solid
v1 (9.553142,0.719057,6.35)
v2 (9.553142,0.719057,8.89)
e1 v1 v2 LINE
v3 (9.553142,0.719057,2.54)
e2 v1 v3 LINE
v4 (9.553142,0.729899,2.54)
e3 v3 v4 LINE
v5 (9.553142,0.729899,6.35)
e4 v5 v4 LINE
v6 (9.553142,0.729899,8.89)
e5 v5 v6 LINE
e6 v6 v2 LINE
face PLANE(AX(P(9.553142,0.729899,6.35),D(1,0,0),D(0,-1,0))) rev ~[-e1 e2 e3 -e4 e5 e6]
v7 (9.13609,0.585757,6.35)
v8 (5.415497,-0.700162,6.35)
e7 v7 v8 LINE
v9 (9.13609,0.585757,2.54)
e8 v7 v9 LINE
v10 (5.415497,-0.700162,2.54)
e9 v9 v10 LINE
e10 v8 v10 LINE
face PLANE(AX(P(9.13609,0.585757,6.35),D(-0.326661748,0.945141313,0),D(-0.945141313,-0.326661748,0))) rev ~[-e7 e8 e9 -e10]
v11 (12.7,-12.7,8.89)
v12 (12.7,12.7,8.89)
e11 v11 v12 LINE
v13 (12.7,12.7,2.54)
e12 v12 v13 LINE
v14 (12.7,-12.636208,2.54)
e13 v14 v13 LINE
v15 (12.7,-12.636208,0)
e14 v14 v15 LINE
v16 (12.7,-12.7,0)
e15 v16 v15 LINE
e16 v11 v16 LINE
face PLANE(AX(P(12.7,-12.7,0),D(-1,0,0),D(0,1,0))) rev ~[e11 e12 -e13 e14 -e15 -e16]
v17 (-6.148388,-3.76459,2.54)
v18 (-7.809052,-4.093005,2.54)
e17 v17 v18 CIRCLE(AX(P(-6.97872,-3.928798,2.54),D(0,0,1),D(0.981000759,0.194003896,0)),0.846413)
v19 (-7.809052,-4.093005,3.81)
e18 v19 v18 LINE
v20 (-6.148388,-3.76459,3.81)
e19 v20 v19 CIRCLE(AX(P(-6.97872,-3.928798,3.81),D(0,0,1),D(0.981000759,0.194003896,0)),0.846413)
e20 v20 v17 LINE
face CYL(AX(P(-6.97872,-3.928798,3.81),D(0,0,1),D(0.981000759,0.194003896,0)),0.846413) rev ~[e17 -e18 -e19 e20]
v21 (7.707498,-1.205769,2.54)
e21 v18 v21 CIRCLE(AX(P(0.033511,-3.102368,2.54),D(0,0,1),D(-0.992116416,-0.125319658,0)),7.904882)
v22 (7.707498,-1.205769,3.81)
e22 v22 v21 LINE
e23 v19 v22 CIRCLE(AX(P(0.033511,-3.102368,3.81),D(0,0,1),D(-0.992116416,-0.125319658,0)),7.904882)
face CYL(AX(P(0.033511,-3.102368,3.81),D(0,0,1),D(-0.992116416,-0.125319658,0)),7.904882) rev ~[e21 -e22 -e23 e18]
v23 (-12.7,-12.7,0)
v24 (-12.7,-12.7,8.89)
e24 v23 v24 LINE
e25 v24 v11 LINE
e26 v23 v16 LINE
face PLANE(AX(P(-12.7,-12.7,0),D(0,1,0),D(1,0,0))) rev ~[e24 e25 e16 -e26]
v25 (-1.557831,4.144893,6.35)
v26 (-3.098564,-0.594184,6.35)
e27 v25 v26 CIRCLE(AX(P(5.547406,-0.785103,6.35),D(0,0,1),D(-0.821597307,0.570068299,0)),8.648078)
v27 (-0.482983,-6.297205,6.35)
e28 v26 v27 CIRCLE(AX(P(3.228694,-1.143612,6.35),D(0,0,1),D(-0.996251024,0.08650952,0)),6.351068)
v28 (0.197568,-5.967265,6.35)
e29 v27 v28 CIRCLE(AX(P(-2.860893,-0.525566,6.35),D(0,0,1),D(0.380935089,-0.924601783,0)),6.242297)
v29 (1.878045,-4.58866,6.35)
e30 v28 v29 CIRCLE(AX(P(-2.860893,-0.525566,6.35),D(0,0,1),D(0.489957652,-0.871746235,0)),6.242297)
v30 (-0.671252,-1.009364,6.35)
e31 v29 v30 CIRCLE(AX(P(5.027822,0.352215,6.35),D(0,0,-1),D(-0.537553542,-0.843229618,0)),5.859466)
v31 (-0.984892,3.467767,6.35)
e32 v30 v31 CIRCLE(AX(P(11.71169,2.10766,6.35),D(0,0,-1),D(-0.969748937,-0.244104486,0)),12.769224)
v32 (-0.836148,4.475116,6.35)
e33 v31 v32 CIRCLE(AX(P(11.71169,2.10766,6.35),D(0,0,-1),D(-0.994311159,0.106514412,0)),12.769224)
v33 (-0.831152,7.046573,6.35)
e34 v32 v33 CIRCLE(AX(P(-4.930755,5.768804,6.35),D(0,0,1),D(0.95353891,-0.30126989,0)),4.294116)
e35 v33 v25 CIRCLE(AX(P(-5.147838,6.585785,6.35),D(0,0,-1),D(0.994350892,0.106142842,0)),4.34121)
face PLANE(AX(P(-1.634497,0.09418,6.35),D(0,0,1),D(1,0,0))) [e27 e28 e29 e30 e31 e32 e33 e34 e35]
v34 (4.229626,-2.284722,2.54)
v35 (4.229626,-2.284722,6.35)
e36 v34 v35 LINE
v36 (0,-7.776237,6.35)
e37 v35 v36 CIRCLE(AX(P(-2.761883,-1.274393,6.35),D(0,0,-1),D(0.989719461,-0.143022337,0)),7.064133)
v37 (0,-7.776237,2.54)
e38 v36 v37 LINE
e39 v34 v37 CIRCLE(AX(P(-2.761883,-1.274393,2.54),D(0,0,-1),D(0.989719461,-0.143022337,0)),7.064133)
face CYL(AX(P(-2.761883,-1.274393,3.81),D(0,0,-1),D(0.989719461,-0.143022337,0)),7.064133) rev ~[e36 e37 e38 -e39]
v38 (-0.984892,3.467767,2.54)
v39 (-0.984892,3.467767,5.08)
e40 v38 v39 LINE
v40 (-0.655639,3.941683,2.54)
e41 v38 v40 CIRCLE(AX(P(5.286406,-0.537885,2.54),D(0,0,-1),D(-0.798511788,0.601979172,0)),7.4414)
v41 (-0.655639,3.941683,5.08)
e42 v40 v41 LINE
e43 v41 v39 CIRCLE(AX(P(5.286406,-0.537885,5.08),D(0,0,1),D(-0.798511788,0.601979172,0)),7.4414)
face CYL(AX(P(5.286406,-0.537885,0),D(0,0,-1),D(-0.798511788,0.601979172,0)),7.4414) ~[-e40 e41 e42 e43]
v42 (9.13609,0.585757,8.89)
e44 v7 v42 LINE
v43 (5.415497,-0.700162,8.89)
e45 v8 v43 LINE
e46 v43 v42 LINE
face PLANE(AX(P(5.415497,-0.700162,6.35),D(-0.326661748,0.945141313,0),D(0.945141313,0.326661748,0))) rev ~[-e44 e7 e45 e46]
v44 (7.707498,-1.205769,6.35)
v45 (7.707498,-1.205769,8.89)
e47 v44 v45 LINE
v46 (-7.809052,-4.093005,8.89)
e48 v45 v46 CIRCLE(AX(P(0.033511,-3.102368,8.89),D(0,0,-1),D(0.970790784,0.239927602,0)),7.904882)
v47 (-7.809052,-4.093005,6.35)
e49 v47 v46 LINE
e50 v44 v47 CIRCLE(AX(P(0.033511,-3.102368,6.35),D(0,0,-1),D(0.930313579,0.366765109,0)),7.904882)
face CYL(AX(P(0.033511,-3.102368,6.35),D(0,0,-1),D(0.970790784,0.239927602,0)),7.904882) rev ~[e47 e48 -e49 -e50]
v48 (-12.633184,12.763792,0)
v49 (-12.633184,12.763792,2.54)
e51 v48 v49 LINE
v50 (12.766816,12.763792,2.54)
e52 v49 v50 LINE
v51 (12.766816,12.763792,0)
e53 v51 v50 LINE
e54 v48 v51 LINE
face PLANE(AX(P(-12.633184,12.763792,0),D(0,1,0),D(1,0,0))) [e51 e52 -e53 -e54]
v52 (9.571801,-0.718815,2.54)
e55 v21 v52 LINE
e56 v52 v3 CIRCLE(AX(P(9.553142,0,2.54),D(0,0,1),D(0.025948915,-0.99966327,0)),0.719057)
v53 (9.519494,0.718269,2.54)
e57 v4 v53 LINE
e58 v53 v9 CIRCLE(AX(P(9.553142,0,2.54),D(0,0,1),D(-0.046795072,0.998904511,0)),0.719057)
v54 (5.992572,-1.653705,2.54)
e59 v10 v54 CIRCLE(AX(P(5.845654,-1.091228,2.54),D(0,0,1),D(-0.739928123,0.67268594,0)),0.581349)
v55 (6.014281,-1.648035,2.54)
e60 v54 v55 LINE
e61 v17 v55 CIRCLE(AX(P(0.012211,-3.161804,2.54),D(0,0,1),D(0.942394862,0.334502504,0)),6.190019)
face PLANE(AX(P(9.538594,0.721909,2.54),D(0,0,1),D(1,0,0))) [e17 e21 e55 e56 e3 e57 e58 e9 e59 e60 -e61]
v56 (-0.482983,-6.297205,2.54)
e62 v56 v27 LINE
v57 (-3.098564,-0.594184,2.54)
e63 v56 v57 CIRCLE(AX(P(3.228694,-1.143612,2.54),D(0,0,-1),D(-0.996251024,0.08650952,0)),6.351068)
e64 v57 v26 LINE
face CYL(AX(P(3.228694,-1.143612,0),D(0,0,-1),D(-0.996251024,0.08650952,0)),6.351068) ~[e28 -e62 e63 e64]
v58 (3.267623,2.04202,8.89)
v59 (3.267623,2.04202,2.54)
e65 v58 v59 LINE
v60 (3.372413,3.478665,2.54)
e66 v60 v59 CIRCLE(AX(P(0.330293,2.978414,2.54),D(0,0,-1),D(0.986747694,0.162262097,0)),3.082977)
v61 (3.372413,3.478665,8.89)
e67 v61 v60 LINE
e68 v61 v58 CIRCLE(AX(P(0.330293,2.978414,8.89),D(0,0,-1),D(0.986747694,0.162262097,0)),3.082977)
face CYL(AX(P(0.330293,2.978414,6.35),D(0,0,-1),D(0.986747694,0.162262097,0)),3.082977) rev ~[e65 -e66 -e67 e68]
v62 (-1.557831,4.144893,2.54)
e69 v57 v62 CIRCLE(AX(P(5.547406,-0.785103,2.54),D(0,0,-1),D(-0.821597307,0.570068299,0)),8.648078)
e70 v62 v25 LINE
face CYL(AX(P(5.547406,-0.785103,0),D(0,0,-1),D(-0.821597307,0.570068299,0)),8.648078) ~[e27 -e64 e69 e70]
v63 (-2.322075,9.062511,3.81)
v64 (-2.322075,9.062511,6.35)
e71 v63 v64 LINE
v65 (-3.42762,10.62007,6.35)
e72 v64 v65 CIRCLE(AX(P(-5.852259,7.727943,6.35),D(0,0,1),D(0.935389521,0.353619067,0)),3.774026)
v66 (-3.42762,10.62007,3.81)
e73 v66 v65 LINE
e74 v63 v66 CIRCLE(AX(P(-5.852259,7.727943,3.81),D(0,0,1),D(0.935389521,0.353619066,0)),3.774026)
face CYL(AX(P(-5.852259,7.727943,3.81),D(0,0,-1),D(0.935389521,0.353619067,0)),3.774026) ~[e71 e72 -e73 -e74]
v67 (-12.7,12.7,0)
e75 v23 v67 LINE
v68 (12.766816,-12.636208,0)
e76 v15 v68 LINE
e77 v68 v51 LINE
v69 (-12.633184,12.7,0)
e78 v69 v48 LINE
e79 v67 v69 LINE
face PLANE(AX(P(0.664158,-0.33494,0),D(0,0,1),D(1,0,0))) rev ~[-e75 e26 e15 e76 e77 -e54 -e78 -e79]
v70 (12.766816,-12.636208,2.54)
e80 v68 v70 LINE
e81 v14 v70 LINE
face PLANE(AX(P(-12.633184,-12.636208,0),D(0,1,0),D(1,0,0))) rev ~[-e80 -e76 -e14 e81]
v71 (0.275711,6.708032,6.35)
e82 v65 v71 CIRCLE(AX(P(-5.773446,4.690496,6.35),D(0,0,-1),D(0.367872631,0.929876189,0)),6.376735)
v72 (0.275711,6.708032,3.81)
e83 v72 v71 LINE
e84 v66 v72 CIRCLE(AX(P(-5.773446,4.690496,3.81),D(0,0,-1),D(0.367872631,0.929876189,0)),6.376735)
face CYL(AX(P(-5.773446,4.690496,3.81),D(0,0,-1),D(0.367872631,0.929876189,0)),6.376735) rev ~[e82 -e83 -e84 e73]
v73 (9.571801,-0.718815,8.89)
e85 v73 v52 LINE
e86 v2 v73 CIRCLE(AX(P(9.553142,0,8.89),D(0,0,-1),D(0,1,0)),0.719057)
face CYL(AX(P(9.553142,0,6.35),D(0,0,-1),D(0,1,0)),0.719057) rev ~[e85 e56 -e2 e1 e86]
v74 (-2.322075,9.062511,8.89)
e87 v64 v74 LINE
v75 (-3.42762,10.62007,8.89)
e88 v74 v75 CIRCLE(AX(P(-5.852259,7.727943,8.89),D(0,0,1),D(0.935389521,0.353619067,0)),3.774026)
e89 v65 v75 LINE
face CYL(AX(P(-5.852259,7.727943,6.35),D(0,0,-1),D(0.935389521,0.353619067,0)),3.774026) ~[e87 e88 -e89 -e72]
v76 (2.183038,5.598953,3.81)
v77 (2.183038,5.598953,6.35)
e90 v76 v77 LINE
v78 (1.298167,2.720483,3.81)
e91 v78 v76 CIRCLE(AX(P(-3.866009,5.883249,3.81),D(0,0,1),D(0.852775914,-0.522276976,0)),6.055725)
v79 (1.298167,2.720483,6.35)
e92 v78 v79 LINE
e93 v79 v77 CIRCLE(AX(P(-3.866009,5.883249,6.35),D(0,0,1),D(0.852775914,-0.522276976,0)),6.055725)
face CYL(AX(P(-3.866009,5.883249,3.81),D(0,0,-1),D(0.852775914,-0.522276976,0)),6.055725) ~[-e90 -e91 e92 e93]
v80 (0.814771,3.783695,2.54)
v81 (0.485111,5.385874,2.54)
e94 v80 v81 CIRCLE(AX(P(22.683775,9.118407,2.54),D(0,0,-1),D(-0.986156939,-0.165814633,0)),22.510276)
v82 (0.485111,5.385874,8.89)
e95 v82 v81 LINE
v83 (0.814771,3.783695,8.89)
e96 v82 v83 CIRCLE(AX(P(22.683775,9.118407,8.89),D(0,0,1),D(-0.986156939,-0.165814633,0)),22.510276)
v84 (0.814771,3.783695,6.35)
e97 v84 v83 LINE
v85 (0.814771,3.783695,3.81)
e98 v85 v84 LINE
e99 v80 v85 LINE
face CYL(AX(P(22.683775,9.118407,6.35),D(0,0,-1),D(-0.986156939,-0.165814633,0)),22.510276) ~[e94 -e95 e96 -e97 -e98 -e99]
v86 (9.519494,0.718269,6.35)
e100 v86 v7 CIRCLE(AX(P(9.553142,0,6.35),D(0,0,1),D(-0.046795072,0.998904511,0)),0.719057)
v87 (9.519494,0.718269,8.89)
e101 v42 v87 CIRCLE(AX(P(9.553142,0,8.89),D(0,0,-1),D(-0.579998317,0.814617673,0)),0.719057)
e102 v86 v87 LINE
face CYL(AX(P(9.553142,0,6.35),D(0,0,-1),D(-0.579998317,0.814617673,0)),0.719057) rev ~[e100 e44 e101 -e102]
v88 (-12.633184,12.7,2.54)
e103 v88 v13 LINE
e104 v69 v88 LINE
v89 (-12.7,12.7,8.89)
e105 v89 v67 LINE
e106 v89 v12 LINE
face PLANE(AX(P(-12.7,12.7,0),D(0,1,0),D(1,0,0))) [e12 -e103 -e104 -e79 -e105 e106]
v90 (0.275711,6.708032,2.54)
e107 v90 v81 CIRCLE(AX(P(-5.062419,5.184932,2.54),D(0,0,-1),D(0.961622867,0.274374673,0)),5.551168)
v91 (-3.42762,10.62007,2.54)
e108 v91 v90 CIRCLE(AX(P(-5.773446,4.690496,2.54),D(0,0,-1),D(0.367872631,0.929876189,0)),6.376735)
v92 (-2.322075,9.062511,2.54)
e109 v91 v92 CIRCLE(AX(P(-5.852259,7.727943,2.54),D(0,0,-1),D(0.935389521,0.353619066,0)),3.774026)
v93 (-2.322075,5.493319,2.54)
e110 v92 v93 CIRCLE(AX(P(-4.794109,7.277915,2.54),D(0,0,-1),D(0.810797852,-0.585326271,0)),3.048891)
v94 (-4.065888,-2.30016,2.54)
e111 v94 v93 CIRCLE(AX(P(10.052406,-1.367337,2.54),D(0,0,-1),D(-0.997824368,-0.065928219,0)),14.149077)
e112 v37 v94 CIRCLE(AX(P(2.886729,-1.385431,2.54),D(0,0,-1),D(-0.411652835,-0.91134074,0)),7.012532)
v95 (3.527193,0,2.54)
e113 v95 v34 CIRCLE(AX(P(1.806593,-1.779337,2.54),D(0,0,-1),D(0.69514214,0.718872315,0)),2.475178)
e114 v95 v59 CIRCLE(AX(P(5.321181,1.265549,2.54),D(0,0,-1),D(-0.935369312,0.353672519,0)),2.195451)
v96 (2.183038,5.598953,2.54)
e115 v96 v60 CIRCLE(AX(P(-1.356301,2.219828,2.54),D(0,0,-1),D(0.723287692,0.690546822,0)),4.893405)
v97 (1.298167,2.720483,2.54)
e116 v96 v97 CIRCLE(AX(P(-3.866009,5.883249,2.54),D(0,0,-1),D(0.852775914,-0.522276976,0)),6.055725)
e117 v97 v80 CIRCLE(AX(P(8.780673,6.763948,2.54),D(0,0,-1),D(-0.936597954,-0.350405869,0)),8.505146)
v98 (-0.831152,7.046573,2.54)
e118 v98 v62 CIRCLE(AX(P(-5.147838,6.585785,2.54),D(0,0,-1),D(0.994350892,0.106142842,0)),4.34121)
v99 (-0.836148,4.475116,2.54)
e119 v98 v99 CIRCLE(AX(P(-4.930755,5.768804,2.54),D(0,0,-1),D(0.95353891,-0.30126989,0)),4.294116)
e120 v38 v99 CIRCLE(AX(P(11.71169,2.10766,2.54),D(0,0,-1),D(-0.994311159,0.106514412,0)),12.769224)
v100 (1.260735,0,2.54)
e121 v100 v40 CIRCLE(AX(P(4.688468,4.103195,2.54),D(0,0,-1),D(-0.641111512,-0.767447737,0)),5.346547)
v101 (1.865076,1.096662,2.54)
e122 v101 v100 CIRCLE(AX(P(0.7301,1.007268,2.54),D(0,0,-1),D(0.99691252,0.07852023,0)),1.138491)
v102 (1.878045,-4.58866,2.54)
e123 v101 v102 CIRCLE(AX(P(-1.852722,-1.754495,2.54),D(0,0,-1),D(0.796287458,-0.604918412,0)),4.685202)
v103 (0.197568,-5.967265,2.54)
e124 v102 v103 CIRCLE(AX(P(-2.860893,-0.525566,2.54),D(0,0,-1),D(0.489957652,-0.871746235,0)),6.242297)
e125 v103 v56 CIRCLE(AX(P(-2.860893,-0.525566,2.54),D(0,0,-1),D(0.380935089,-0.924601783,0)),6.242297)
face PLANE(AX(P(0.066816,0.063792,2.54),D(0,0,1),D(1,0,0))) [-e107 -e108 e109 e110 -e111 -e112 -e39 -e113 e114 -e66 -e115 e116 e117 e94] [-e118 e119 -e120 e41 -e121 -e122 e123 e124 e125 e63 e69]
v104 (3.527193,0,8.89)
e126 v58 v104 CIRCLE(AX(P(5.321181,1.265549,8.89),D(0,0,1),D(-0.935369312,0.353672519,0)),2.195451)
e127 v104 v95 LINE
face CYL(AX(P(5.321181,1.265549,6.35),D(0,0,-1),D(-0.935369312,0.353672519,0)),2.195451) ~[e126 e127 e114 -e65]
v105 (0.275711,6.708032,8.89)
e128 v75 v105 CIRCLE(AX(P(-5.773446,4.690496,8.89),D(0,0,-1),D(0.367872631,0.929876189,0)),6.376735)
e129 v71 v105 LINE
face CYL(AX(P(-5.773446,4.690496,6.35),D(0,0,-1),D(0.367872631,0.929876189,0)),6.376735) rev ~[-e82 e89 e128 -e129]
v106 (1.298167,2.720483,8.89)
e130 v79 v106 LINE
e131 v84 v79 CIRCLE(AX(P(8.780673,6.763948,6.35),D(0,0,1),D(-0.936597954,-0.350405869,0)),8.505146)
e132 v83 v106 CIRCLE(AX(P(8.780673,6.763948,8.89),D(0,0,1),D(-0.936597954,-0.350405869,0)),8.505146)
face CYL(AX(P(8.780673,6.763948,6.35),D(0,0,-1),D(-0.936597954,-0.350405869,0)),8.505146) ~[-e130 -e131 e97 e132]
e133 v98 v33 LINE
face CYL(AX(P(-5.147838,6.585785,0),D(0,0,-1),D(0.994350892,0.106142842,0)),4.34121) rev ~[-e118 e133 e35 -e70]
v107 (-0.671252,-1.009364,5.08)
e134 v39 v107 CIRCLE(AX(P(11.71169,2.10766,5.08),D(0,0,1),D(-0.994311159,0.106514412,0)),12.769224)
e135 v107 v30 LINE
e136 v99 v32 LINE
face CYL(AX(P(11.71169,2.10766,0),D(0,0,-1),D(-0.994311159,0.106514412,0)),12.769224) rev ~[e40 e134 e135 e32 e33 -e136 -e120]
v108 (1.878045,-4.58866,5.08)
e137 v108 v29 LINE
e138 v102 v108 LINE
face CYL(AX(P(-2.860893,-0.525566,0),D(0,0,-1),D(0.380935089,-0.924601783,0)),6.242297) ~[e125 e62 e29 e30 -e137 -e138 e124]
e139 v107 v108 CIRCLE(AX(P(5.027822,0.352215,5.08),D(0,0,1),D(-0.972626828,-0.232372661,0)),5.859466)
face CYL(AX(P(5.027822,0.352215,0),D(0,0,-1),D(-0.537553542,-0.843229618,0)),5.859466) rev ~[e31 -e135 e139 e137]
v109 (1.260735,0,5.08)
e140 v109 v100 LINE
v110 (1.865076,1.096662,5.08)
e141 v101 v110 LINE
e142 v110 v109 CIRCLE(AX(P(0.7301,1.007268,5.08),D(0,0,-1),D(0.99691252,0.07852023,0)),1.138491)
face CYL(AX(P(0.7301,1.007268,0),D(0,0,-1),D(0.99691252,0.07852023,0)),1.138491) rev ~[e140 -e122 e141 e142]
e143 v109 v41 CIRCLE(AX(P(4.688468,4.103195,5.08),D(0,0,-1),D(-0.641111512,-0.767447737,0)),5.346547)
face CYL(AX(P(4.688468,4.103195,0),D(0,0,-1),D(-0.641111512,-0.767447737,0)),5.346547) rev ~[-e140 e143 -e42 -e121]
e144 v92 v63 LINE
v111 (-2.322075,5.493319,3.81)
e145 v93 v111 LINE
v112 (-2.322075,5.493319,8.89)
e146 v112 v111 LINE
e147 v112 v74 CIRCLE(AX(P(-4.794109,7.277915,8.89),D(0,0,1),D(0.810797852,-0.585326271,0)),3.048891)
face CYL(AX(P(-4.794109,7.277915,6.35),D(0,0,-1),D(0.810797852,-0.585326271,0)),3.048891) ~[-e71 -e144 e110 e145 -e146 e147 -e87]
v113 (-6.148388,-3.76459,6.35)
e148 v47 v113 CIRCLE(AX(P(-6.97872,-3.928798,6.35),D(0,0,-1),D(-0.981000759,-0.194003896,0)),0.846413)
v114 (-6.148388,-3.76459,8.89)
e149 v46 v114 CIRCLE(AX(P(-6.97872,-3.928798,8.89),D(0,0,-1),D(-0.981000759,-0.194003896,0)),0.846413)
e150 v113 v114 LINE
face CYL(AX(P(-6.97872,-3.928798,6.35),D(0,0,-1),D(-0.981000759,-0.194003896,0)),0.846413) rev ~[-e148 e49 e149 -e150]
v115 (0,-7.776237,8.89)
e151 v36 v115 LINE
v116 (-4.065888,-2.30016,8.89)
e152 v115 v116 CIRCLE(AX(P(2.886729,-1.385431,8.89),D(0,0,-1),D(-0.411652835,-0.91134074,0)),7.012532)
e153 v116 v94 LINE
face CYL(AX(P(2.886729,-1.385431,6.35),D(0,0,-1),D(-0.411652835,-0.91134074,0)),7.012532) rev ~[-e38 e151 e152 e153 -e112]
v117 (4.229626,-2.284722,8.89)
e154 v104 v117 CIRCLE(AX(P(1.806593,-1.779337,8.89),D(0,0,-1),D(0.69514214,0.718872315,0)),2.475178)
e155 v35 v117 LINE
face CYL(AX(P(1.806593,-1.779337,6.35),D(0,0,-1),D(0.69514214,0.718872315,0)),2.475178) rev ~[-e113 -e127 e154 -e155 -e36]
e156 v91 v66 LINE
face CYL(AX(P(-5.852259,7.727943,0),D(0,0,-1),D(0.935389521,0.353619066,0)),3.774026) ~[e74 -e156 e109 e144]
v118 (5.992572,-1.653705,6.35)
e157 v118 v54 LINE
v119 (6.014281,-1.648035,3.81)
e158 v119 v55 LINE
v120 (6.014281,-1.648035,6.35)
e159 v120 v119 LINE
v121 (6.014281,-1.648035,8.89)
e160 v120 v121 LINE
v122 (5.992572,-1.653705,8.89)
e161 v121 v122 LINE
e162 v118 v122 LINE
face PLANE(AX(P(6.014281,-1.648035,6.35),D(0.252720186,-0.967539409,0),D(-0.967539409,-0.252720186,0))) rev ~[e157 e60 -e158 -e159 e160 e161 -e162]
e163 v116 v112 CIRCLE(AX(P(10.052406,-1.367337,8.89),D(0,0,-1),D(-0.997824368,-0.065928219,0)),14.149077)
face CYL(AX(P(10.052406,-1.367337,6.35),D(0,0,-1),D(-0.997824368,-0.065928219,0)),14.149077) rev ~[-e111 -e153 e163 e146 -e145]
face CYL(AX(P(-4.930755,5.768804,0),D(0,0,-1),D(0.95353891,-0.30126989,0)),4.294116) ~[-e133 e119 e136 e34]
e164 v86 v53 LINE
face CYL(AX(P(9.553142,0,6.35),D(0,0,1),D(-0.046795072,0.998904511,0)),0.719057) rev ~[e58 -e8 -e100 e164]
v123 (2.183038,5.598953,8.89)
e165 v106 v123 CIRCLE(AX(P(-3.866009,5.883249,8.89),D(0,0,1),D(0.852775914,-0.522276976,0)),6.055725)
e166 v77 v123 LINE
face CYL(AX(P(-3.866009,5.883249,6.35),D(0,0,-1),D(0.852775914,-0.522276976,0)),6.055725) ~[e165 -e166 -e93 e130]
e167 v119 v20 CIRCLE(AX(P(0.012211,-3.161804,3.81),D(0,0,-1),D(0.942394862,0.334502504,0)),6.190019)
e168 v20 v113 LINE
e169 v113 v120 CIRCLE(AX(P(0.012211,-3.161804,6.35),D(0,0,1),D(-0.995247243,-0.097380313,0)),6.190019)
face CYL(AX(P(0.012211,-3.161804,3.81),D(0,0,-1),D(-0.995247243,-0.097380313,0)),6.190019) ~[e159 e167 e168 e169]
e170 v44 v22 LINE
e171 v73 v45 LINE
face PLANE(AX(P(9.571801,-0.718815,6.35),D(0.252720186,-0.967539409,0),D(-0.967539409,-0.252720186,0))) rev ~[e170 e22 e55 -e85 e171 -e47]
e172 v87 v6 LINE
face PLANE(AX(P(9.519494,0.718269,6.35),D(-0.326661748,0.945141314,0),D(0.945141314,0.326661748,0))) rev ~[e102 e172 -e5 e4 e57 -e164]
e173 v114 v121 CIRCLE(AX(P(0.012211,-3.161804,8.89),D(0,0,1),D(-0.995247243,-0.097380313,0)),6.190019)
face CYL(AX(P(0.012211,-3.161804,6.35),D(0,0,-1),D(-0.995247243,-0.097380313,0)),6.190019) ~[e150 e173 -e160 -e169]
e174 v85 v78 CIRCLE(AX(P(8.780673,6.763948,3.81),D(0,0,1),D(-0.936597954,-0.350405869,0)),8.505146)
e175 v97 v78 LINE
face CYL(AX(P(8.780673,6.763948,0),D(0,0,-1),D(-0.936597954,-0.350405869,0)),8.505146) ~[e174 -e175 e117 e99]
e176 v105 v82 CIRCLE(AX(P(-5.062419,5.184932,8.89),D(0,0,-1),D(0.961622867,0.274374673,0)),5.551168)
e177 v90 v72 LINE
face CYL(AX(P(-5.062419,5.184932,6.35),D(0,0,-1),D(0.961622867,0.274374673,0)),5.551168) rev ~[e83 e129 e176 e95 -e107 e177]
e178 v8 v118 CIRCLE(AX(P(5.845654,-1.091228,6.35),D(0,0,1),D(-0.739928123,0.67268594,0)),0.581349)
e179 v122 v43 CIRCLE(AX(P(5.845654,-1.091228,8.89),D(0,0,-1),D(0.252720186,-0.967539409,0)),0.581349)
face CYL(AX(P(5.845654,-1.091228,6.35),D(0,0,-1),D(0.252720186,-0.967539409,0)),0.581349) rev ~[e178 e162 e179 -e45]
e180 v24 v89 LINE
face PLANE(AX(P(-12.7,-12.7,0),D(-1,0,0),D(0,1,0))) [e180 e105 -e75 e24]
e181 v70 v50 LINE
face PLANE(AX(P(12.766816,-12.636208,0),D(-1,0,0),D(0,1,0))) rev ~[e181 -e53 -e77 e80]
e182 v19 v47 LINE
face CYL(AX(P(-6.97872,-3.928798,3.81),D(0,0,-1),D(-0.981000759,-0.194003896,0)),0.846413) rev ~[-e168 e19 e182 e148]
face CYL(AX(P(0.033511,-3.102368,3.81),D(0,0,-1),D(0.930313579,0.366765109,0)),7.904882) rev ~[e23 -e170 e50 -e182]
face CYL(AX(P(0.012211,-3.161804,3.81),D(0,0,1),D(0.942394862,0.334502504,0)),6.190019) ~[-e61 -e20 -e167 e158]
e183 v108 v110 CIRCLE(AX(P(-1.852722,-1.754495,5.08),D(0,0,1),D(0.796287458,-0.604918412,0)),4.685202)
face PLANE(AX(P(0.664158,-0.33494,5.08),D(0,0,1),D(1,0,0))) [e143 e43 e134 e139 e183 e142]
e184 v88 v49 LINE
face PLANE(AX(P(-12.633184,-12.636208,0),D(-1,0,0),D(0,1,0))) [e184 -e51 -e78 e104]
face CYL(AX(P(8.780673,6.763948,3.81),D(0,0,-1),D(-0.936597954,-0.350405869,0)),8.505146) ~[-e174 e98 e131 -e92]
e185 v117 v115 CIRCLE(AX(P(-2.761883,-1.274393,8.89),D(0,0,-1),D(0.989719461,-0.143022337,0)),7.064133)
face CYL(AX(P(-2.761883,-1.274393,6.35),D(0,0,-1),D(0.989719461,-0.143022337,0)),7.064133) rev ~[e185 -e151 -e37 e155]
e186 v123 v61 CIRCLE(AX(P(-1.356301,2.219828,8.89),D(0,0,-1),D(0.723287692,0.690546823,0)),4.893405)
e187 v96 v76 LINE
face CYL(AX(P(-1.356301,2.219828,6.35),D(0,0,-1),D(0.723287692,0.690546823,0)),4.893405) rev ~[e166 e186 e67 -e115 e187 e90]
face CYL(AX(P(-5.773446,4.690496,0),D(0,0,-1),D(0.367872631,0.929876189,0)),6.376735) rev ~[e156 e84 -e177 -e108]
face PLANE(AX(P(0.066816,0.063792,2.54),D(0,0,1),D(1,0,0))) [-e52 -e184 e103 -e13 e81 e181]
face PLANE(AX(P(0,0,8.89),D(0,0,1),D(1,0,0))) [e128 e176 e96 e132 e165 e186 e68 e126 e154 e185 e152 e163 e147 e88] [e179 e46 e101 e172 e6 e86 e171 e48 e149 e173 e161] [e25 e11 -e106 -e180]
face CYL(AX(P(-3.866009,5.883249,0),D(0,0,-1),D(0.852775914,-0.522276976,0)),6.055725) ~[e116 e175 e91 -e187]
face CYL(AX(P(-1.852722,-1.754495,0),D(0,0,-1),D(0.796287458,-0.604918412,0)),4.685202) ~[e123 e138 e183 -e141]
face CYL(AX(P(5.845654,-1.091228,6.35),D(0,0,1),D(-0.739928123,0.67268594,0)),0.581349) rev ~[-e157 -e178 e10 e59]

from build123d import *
from build123d import SkipClean  # not in build123d's __all__

# Parameters (mm, degrees)
F0_W      = 25.4
F0_H      = 25.4
F1_DEPTH  = 3.81
F3_DEPTH  = 6.35
F4_W      = 25.4
F4_H      = 25.4
F1_FACE_W = 25.4
F1_FACE_H = 25.4
F5_DEPTH  = 2.54
F7_DEPTH  = 3.81
F5_FACE_W = 25.4
F5_FACE_H = 25.4
F8_DEPTH  = 2.54
F9_DEPTH  = 6.35
F10_DEPTH = 5.08


# Not quite as in the source:
# - a feature names something its author has since deleted; it is built from what else it names


with BuildPart() as f1:
    # F0 (on Top) → F1 (new body)
    with BuildSketch(Plane.XY):
        Rectangle(F0_W, F0_H)
        with BuildLine():
            ThreePointArc((-2.3220747757, 5.493318662), (-1.7452180631, 7.2779146179), (-2.3220747757, 9.0625105738))
            ThreePointArc((-2.3220747757, 9.0625105738), (-2.7746823601, 9.912386532), (-3.427619813, 10.62006969))
            ThreePointArc((-3.427619813, 10.62006969), (-1.1425772736, 9.0743071478), (0.2757107432, 6.7080315202))
            ThreePointArc((0.2757107432, 6.7080315202), (0.4204105595, 6.0532877613), (0.4851105891, 5.3858738471))
            ThreePointArc((0.4851105891, 5.3858738471), (0.6353827008, 4.5817890382), (0.8147705941, 3.7836950142))
            ThreePointArc((0.8147705941, 3.7836950142), (1.0381967432, 3.2437817697), (1.2981665786, 2.7204833459))
            ThreePointArc((1.2981665786, 2.7204833459), (1.922383445, 4.1038367613), (2.1830380429, 5.5989529938))
            ThreePointArc((2.1830380429, 5.5989529938), (2.9114948167, 4.6138465954), (3.372413034, 3.4786645464))
            ThreePointArc((3.372413034, 3.4786645464), (3.4051009388, 2.7541360468), (3.2676233133, 2.0420195197))
            ThreePointArc((3.2676233133, 2.0420195197), (3.1432548322, 0.9887032001), (3.5271933302, 0))
            ThreePointArc((3.5271933302, 0), (4.1724784116, -1.0519502273), (4.2296264741, -2.2847219888))
            ThreePointArc((4.2296264741, -2.2847219888), (2.8346650657, -5.5849174863), (0, -7.7762370929))
            ThreePointArc((0, -7.7762370929), (-2.7435493808, -5.5658105565), (-4.0658875369, -2.3001604713))
            ThreePointArc((-4.0658875369, -2.3001604713), (-3.7552495624, 1.7221644716), (-2.3220747757, 5.493318662))
        make_face(mode=Mode.SUBTRACT)
    extrude(amount=F1_DEPTH)

    # F2 (on face) → F3 (cut)
    with BuildSketch(Plane.XY.offset(3.81)):
        with BuildLine():
            ThreePointArc((-6.1483882188, -3.7645904891), (-7.1429274149, -3.0984661258), (-7.8090517782, -4.0930053219))
            ThreePointArc((-7.8090517782, -4.0930053219), (1.9937266905, -10.7603517397), (7.3875300738, -0.2031334023))
            ThreePointArc((7.3875300738, -0.2031334023), (6.5005634578, -0.4457360723), (5.8456538245, -1.0912275175))
            ThreePointArc((5.8456538245, -1.0912275175), (1.3588648275, -9.2035644572), (-6.1483882188, -3.7645904891))
        make_face()
    extrude(amount=-F3_DEPTH, mode=Mode.SUBTRACT)



with BuildPart() as f1b:
    # F0 (on Top) → F1, piece 2 (new body)
    with BuildSketch(Plane.XY):
        with BuildLine():
            ThreePointArc((1.2607348617, 0), (-0.1199112872, 1.7654494083), (-0.65563916, 3.941682633))
            ThreePointArc((-0.65563916, 3.941682633), (-0.8248612998, 3.7079174894), (-0.9848921893, 3.4677667255))
            ThreePointArc((-0.9848921893, 3.4677667255), (-1.0263163384, 1.2153133206), (-0.671251677, -1.009364496))
            ThreePointArc((-0.671251677, -1.009364496), (0.2551522442, -3.0470440914), (1.8780454732, -4.5886601027))
            ThreePointArc((1.8780454732, -4.5886601027), (2.8324677453, -1.7438067709), (1.8650756683, 1.0966623668))
            ThreePointArc((1.8650756683, 1.0966623668), (1.7272115994, 0.4577864308), (1.2607348617, 0))
        make_face()
        with BuildLine():
            ThreePointArc((-0.671251677, -1.009364496), (-1.0263163384, 1.2153133206), (-0.9848921893, 3.4677667255))
            ThreePointArc((-0.9848921893, 3.4677667255), (-2.0972329272, -1.4632517602), (0.1975684196, -5.9672646379))
            ThreePointArc((0.1975684196, -5.9672646379), (1.0982734454, -5.351669196), (1.8780454732, -4.5886601027))
            ThreePointArc((1.8780454732, -4.5886601027), (0.2551522442, -3.0470440914), (-0.671251677, -1.009364496))
        make_face()
        with BuildLine():
            ThreePointArc((0.1975684196, -5.9672646379), (-2.0972329272, -1.4632517602), (-0.9848921893, 3.4677667255))
            ThreePointArc((-0.9848921893, 3.4677667255), (-0.9205654294, 3.97292477), (-0.8361481014, 4.4751162641))
            ThreePointArc((-0.8361481014, 4.4751162641), (-0.6366469014, 5.7604618421), (-0.8311524871, 7.0465728641))
            ThreePointArc((-0.8311524871, 7.0465728641), (-0.9366764425, 5.531166985), (-1.5578314768, 4.1448925869))
            ThreePointArc((-1.5578314768, 4.1448925869), (-2.6769387693, 1.8887344687), (-3.0985642225, -0.5941836862))
            ThreePointArc((-3.0985642225, -0.5941836862), (-2.5441879685, -3.7912333048), (-0.4829827521, -6.2972046435))
            ThreePointArc((-0.4829827521, -6.2972046435), (-0.1377056519, -6.1425510207), (0.1975684196, -5.9672646379))
        make_face()
    extrude(amount=F1_DEPTH)


with BuildPart() as f1_1:
    add(f1.part, clean=False)

    with SkipClean():  # cleaning this boolean's faces spoils the solid; the shape is the same uncleaned
        add(f1b.part)  # F5 merges F1b
    # F4 (on Top) + F1_face (on face) → F5 (join)
    with BuildSketch(Plane.XY):
        with Locations((0.066815722, 0.0637920246)):
            Rectangle(F4_W, F4_H)
    with BuildSketch(Plane(origin=(0.026992419, 0.041114738, 3.81), x_dir=(1, 0, 0), z_dir=(0, 0, 1))):
        with Locations((-0.026992419, -0.041114738)):
            Rectangle(F1_FACE_W, F1_FACE_H)
        with BuildLine():
            ThreePointArc((-7.8360441972, -4.1341200599), (-7.1699198339, -3.1395808638), (-6.1753806378, -3.805705227))
            ThreePointArc((-6.1753806378, -3.805705227), (1.3318724085, -9.2446791952), (5.8186614055, -1.1323422554))
            ThreePointArc((5.8186614055, -1.1323422554), (6.4735710387, -0.4868508103), (7.3605376548, -0.2442481402))
            ThreePointArc((7.3605376548, -0.2442481402), (1.9667342715, -10.8014664776), (-7.8360441972, -4.1341200599))
        make_face(mode=Mode.SUBTRACT)
        with BuildLine():
            ThreePointArc((-0.026992419, -7.8173518309), (-2.7705417999, -5.6069252945), (-4.0928799559, -2.3412752093))
            ThreePointArc((-4.0928799559, -2.3412752093), (-3.7822419814, 1.6810497336), (-2.3490671947, 5.4522039241))
            ThreePointArc((-2.3490671947, 5.4522039241), (-1.7722104822, 7.23679988), (-2.3490671947, 9.0213958359))
            ThreePointArc((-2.3490671947, 9.0213958359), (-2.8016747791, 9.871271794), (-3.454612232, 10.5789549521))
            ThreePointArc((-3.454612232, 10.5789549521), (-1.1695696926, 9.0331924098), (0.2487183241, 6.6669167823))
            ThreePointArc((0.2487183241, 6.6669167823), (0.3934181404, 6.0121730233), (0.4581181701, 5.3447591091))
            ThreePointArc((0.4581181701, 5.3447591091), (0.6083902818, 4.5406743002), (0.787778175, 3.7425802762))
            ThreePointArc((0.787778175, 3.7425802762), (1.0112043242, 3.2026670317), (1.2711741596, 2.6793686079))
            ThreePointArc((1.2711741596, 2.6793686079), (1.895391026, 4.0627220233), (2.1560456238, 5.5578382558))
            ThreePointArc((2.1560456238, 5.5578382558), (2.8845023977, 4.5727318574), (3.345420615, 3.4375498084))
            ThreePointArc((3.345420615, 3.4375498084), (3.3781085198, 2.7130213089), (3.2406308943, 2.0009047817))
            ThreePointArc((3.2406308943, 2.0009047817), (3.1162624132, 0.9475884621), (3.5002009112, -0.041114738))
            ThreePointArc((3.5002009112, -0.041114738), (4.1454859925, -1.0930649653), (4.2026340551, -2.3258367268))
            ThreePointArc((4.2026340551, -2.3258367268), (2.8076726467, -5.6260322243), (-0.026992419, -7.8173518309))
        make_face(mode=Mode.SUBTRACT)
    with SkipClean():  # cleaning this boolean's faces spoils the solid; the shape is the same uncleaned
        extrude(amount=F5_DEPTH)

    # F6 (on face) → F7 (cut)
    with BuildSketch(Plane.XY.offset(6.35)):
        with BuildLine():
            Line((9.553141892, 0.7298990968), (9.5194935584, 0.7182694883))
            ThreePointArc((9.5194935584, 0.7182694883), (9.5363131156, 0.7188602509), (9.553141892, 0.7190572078))
            Line((9.553141892, 0.7190572078), (9.553141892, 0.7298990968))
        make_face()
        with BuildLine():
            Line((9.1360899218, 0.5857567091), (5.4154974922, -0.7001623479))
            ThreePointArc((5.4154974922, -0.7001623479), (5.3482937998, -1.3922249308), (5.9925724035, -1.6537053999))
            Line((5.9925724035, -1.6537053999), (6.0142811862, -1.6480350907))
            ThreePointArc((6.0142811862, -1.6480350907), (5.9365127083, -1.3676491107), (5.8456538245, -1.0912275175))
            ThreePointArc((5.8456538245, -1.0912275175), (6.5005634578, -0.4457360723), (7.3875300738, -0.2031334023))
            ThreePointArc((7.3875300738, -0.2031334023), (7.5642186753, -0.6991201958), (7.7074975952, -1.2057689028))
            Line((7.7074975952, -1.2057689028), (9.5718006466, -0.7188150798))
            ThreePointArc((9.5718006466, -0.7188150798), (10.2721385652, 0.0093301628), (9.553141892, 0.7190572078))
            ThreePointArc((9.553141892, 0.7190572078), (9.5363131156, 0.7188602509), (9.5194935584, 0.7182694883))
            ThreePointArc((9.5194935584, 0.7182694883), (9.3182534076, 0.6796106738), (9.1360899218, 0.5857567091))
        make_face()
    with SkipClean():  # cleaning this boolean's faces spoils the solid; the shape is the same uncleaned
        extrude(amount=-F7_DEPTH, mode=Mode.SUBTRACT)

    # F0 (on Top) + F5_face (on face) → F8 (join)
    with BuildSketch(Plane.XY):
        with BuildLine():
            ThreePointArc((1.2607348617, 0), (-0.1199112872, 1.7654494083), (-0.65563916, 3.941682633))
            ThreePointArc((-0.65563916, 3.941682633), (-0.8248612998, 3.7079174894), (-0.9848921893, 3.4677667255))
            ThreePointArc((-0.9848921893, 3.4677667255), (-1.0263163384, 1.2153133206), (-0.671251677, -1.009364496))
            ThreePointArc((-0.671251677, -1.009364496), (0.2551522442, -3.0470440914), (1.8780454732, -4.5886601027))
            ThreePointArc((1.8780454732, -4.5886601027), (2.8324677453, -1.7438067709), (1.8650756683, 1.0966623668))
            ThreePointArc((1.8650756683, 1.0966623668), (1.7272115994, 0.4577864308), (1.2607348617, 0))
        make_face()
    with BuildSketch(Plane(origin=(-0.0427124334, 0.6105090747, 6.35), x_dir=(1, 0, 0), z_dir=(0, 0, 1))):
        with Locations((0.0427124334, -0.6105090747)):
            Rectangle(F5_FACE_W, F5_FACE_H)
        with BuildLine():
            ThreePointArc((-6.1056757855, -4.3750995638), (1.1161658852, -9.8706825468), (6.0569936196, -2.2585441654))
            Line((6.0569936196, -2.2585441654), (6.0352848369, -2.2642144746))
            ThreePointArc((6.0352848369, -2.2642144746), (5.3910062331, -2.0027340055), (5.4582099255, -1.3106714226))
            Line((5.4582099255, -1.3106714226), (9.1788023552, -0.0247523655))
            ThreePointArc((9.1788023552, -0.0247523655), (9.3609658409, 0.0691015992), (9.5622059917, 0.1077604136))
            Line((9.5622059917, 0.1077604136), (9.5958543253, 0.1193900221))
            Line((9.5958543253, 0.1193900221), (9.5958543253, 0.1085481331))
            ThreePointArc((9.5958543253, 0.1085481331), (10.3148509986, -0.6011789119), (9.61451308, -1.3293241545))
            Line((9.61451308, -1.3293241545), (7.7502100286, -1.8162779775))
            ThreePointArc((7.7502100286, -1.8162779775), (1.5223004235, -11.4843648142), (-7.7663393448, -4.7035143966))
            ThreePointArc((-7.7663393448, -4.7035143966), (-7.1002149816, -3.7089752005), (-6.1056757855, -4.3750995638))
        make_face(mode=Mode.SUBTRACT)
        with BuildLine():
            ThreePointArc((2.2257504762, 4.9884439191), (2.9542072501, 4.0033375207), (3.4151254674, 2.8681554717))
            ThreePointArc((3.4151254674, 2.8681554717), (3.4478133722, 2.1436269722), (3.3103357467, 1.431510445))
            ThreePointArc((3.3103357467, 1.431510445), (3.1859672656, 0.3781941254), (3.5699057636, -0.6105090747))
            ThreePointArc((3.5699057636, -0.6105090747), (4.2151908449, -1.662459302), (4.2723389075, -2.8952310635))
            ThreePointArc((4.2723389075, -2.8952310635), (2.877377499, -6.195426561), (0.0427124334, -8.3867461676))
            ThreePointArc((0.0427124334, -8.3867461676), (-2.7008369475, -6.1763196312), (-4.0231751035, -2.910669546))
            ThreePointArc((-4.0231751035, -2.910669546), (-3.712537129, 1.1116553969), (-2.2793623423, 4.8828095874))
            ThreePointArc((-2.2793623423, 4.8828095874), (-1.7025056298, 6.6674055433), (-2.2793623423, 8.4520014992))
            ThreePointArc((-2.2793623423, 8.4520014992), (-2.7319699267, 9.3018774573), (-3.3849073797, 10.0095606154))
            ThreePointArc((-3.3849073797, 10.0095606154), (-1.0998648402, 8.4637980731), (0.3184231765, 6.0975224456))
            ThreePointArc((0.3184231765, 6.0975224456), (0.4631229928, 5.4427786866), (0.5278230225, 4.7753647724))
            ThreePointArc((0.5278230225, 4.7753647724), (0.6780951342, 3.9712799635), (0.8574830274, 3.1731859395))
            ThreePointArc((0.8574830274, 3.1731859395), (1.0809091765, 2.633272695), (1.340879012, 2.1099742712))
            ThreePointArc((1.340879012, 2.1099742712), (1.9650958783, 3.4933276866), (2.2257504762, 4.9884439191))
        make_face(mode=Mode.SUBTRACT)
    extrude(amount=F8_DEPTH)

    # F0 (on Top) → F9 (join)
    with BuildSketch(Plane.XY):
        with BuildLine():
            ThreePointArc((0.1975684196, -5.9672646379), (-2.0972329272, -1.4632517602), (-0.9848921893, 3.4677667255))
            ThreePointArc((-0.9848921893, 3.4677667255), (-0.9205654294, 3.97292477), (-0.8361481014, 4.4751162641))
            ThreePointArc((-0.8361481014, 4.4751162641), (-0.6366469014, 5.7604618421), (-0.8311524871, 7.0465728641))
            ThreePointArc((-0.8311524871, 7.0465728641), (-0.9366764425, 5.531166985), (-1.5578314768, 4.1448925869))
            ThreePointArc((-1.5578314768, 4.1448925869), (-2.6769387693, 1.8887344687), (-3.0985642225, -0.5941836862))
            ThreePointArc((-3.0985642225, -0.5941836862), (-2.5441879685, -3.7912333048), (-0.4829827521, -6.2972046435))
            ThreePointArc((-0.4829827521, -6.2972046435), (-0.1377056519, -6.1425510207), (0.1975684196, -5.9672646379))
        make_face()
        with BuildLine():
            ThreePointArc((-0.671251677, -1.009364496), (-1.0263163384, 1.2153133206), (-0.9848921893, 3.4677667255))
            ThreePointArc((-0.9848921893, 3.4677667255), (-2.0972329272, -1.4632517602), (0.1975684196, -5.9672646379))
            ThreePointArc((0.1975684196, -5.9672646379), (1.0982734454, -5.351669196), (1.8780454732, -4.5886601027))
            ThreePointArc((1.8780454732, -4.5886601027), (0.2551522442, -3.0470440914), (-0.671251677, -1.009364496))
        make_face()
    extrude(amount=F9_DEPTH)

    # F0 (on Top) → F10 (join)
    with BuildSketch(Plane.XY):
        with BuildLine():
            ThreePointArc((1.2607348617, 0), (-0.1199112872, 1.7654494083), (-0.65563916, 3.941682633))
            ThreePointArc((-0.65563916, 3.941682633), (-0.8248612998, 3.7079174894), (-0.9848921893, 3.4677667255))
            ThreePointArc((-0.9848921893, 3.4677667255), (-1.0263163384, 1.2153133206), (-0.671251677, -1.009364496))
            ThreePointArc((-0.671251677, -1.009364496), (0.2551522442, -3.0470440914), (1.8780454732, -4.5886601027))
            ThreePointArc((1.8780454732, -4.5886601027), (2.8324677453, -1.7438067709), (1.8650756683, 1.0966623668))
            ThreePointArc((1.8650756683, 1.0966623668), (1.7272115994, 0.4577864308), (1.2607348617, 0))
        make_face()
    extrude(amount=F10_DEPTH)


solid = f1_1.part
